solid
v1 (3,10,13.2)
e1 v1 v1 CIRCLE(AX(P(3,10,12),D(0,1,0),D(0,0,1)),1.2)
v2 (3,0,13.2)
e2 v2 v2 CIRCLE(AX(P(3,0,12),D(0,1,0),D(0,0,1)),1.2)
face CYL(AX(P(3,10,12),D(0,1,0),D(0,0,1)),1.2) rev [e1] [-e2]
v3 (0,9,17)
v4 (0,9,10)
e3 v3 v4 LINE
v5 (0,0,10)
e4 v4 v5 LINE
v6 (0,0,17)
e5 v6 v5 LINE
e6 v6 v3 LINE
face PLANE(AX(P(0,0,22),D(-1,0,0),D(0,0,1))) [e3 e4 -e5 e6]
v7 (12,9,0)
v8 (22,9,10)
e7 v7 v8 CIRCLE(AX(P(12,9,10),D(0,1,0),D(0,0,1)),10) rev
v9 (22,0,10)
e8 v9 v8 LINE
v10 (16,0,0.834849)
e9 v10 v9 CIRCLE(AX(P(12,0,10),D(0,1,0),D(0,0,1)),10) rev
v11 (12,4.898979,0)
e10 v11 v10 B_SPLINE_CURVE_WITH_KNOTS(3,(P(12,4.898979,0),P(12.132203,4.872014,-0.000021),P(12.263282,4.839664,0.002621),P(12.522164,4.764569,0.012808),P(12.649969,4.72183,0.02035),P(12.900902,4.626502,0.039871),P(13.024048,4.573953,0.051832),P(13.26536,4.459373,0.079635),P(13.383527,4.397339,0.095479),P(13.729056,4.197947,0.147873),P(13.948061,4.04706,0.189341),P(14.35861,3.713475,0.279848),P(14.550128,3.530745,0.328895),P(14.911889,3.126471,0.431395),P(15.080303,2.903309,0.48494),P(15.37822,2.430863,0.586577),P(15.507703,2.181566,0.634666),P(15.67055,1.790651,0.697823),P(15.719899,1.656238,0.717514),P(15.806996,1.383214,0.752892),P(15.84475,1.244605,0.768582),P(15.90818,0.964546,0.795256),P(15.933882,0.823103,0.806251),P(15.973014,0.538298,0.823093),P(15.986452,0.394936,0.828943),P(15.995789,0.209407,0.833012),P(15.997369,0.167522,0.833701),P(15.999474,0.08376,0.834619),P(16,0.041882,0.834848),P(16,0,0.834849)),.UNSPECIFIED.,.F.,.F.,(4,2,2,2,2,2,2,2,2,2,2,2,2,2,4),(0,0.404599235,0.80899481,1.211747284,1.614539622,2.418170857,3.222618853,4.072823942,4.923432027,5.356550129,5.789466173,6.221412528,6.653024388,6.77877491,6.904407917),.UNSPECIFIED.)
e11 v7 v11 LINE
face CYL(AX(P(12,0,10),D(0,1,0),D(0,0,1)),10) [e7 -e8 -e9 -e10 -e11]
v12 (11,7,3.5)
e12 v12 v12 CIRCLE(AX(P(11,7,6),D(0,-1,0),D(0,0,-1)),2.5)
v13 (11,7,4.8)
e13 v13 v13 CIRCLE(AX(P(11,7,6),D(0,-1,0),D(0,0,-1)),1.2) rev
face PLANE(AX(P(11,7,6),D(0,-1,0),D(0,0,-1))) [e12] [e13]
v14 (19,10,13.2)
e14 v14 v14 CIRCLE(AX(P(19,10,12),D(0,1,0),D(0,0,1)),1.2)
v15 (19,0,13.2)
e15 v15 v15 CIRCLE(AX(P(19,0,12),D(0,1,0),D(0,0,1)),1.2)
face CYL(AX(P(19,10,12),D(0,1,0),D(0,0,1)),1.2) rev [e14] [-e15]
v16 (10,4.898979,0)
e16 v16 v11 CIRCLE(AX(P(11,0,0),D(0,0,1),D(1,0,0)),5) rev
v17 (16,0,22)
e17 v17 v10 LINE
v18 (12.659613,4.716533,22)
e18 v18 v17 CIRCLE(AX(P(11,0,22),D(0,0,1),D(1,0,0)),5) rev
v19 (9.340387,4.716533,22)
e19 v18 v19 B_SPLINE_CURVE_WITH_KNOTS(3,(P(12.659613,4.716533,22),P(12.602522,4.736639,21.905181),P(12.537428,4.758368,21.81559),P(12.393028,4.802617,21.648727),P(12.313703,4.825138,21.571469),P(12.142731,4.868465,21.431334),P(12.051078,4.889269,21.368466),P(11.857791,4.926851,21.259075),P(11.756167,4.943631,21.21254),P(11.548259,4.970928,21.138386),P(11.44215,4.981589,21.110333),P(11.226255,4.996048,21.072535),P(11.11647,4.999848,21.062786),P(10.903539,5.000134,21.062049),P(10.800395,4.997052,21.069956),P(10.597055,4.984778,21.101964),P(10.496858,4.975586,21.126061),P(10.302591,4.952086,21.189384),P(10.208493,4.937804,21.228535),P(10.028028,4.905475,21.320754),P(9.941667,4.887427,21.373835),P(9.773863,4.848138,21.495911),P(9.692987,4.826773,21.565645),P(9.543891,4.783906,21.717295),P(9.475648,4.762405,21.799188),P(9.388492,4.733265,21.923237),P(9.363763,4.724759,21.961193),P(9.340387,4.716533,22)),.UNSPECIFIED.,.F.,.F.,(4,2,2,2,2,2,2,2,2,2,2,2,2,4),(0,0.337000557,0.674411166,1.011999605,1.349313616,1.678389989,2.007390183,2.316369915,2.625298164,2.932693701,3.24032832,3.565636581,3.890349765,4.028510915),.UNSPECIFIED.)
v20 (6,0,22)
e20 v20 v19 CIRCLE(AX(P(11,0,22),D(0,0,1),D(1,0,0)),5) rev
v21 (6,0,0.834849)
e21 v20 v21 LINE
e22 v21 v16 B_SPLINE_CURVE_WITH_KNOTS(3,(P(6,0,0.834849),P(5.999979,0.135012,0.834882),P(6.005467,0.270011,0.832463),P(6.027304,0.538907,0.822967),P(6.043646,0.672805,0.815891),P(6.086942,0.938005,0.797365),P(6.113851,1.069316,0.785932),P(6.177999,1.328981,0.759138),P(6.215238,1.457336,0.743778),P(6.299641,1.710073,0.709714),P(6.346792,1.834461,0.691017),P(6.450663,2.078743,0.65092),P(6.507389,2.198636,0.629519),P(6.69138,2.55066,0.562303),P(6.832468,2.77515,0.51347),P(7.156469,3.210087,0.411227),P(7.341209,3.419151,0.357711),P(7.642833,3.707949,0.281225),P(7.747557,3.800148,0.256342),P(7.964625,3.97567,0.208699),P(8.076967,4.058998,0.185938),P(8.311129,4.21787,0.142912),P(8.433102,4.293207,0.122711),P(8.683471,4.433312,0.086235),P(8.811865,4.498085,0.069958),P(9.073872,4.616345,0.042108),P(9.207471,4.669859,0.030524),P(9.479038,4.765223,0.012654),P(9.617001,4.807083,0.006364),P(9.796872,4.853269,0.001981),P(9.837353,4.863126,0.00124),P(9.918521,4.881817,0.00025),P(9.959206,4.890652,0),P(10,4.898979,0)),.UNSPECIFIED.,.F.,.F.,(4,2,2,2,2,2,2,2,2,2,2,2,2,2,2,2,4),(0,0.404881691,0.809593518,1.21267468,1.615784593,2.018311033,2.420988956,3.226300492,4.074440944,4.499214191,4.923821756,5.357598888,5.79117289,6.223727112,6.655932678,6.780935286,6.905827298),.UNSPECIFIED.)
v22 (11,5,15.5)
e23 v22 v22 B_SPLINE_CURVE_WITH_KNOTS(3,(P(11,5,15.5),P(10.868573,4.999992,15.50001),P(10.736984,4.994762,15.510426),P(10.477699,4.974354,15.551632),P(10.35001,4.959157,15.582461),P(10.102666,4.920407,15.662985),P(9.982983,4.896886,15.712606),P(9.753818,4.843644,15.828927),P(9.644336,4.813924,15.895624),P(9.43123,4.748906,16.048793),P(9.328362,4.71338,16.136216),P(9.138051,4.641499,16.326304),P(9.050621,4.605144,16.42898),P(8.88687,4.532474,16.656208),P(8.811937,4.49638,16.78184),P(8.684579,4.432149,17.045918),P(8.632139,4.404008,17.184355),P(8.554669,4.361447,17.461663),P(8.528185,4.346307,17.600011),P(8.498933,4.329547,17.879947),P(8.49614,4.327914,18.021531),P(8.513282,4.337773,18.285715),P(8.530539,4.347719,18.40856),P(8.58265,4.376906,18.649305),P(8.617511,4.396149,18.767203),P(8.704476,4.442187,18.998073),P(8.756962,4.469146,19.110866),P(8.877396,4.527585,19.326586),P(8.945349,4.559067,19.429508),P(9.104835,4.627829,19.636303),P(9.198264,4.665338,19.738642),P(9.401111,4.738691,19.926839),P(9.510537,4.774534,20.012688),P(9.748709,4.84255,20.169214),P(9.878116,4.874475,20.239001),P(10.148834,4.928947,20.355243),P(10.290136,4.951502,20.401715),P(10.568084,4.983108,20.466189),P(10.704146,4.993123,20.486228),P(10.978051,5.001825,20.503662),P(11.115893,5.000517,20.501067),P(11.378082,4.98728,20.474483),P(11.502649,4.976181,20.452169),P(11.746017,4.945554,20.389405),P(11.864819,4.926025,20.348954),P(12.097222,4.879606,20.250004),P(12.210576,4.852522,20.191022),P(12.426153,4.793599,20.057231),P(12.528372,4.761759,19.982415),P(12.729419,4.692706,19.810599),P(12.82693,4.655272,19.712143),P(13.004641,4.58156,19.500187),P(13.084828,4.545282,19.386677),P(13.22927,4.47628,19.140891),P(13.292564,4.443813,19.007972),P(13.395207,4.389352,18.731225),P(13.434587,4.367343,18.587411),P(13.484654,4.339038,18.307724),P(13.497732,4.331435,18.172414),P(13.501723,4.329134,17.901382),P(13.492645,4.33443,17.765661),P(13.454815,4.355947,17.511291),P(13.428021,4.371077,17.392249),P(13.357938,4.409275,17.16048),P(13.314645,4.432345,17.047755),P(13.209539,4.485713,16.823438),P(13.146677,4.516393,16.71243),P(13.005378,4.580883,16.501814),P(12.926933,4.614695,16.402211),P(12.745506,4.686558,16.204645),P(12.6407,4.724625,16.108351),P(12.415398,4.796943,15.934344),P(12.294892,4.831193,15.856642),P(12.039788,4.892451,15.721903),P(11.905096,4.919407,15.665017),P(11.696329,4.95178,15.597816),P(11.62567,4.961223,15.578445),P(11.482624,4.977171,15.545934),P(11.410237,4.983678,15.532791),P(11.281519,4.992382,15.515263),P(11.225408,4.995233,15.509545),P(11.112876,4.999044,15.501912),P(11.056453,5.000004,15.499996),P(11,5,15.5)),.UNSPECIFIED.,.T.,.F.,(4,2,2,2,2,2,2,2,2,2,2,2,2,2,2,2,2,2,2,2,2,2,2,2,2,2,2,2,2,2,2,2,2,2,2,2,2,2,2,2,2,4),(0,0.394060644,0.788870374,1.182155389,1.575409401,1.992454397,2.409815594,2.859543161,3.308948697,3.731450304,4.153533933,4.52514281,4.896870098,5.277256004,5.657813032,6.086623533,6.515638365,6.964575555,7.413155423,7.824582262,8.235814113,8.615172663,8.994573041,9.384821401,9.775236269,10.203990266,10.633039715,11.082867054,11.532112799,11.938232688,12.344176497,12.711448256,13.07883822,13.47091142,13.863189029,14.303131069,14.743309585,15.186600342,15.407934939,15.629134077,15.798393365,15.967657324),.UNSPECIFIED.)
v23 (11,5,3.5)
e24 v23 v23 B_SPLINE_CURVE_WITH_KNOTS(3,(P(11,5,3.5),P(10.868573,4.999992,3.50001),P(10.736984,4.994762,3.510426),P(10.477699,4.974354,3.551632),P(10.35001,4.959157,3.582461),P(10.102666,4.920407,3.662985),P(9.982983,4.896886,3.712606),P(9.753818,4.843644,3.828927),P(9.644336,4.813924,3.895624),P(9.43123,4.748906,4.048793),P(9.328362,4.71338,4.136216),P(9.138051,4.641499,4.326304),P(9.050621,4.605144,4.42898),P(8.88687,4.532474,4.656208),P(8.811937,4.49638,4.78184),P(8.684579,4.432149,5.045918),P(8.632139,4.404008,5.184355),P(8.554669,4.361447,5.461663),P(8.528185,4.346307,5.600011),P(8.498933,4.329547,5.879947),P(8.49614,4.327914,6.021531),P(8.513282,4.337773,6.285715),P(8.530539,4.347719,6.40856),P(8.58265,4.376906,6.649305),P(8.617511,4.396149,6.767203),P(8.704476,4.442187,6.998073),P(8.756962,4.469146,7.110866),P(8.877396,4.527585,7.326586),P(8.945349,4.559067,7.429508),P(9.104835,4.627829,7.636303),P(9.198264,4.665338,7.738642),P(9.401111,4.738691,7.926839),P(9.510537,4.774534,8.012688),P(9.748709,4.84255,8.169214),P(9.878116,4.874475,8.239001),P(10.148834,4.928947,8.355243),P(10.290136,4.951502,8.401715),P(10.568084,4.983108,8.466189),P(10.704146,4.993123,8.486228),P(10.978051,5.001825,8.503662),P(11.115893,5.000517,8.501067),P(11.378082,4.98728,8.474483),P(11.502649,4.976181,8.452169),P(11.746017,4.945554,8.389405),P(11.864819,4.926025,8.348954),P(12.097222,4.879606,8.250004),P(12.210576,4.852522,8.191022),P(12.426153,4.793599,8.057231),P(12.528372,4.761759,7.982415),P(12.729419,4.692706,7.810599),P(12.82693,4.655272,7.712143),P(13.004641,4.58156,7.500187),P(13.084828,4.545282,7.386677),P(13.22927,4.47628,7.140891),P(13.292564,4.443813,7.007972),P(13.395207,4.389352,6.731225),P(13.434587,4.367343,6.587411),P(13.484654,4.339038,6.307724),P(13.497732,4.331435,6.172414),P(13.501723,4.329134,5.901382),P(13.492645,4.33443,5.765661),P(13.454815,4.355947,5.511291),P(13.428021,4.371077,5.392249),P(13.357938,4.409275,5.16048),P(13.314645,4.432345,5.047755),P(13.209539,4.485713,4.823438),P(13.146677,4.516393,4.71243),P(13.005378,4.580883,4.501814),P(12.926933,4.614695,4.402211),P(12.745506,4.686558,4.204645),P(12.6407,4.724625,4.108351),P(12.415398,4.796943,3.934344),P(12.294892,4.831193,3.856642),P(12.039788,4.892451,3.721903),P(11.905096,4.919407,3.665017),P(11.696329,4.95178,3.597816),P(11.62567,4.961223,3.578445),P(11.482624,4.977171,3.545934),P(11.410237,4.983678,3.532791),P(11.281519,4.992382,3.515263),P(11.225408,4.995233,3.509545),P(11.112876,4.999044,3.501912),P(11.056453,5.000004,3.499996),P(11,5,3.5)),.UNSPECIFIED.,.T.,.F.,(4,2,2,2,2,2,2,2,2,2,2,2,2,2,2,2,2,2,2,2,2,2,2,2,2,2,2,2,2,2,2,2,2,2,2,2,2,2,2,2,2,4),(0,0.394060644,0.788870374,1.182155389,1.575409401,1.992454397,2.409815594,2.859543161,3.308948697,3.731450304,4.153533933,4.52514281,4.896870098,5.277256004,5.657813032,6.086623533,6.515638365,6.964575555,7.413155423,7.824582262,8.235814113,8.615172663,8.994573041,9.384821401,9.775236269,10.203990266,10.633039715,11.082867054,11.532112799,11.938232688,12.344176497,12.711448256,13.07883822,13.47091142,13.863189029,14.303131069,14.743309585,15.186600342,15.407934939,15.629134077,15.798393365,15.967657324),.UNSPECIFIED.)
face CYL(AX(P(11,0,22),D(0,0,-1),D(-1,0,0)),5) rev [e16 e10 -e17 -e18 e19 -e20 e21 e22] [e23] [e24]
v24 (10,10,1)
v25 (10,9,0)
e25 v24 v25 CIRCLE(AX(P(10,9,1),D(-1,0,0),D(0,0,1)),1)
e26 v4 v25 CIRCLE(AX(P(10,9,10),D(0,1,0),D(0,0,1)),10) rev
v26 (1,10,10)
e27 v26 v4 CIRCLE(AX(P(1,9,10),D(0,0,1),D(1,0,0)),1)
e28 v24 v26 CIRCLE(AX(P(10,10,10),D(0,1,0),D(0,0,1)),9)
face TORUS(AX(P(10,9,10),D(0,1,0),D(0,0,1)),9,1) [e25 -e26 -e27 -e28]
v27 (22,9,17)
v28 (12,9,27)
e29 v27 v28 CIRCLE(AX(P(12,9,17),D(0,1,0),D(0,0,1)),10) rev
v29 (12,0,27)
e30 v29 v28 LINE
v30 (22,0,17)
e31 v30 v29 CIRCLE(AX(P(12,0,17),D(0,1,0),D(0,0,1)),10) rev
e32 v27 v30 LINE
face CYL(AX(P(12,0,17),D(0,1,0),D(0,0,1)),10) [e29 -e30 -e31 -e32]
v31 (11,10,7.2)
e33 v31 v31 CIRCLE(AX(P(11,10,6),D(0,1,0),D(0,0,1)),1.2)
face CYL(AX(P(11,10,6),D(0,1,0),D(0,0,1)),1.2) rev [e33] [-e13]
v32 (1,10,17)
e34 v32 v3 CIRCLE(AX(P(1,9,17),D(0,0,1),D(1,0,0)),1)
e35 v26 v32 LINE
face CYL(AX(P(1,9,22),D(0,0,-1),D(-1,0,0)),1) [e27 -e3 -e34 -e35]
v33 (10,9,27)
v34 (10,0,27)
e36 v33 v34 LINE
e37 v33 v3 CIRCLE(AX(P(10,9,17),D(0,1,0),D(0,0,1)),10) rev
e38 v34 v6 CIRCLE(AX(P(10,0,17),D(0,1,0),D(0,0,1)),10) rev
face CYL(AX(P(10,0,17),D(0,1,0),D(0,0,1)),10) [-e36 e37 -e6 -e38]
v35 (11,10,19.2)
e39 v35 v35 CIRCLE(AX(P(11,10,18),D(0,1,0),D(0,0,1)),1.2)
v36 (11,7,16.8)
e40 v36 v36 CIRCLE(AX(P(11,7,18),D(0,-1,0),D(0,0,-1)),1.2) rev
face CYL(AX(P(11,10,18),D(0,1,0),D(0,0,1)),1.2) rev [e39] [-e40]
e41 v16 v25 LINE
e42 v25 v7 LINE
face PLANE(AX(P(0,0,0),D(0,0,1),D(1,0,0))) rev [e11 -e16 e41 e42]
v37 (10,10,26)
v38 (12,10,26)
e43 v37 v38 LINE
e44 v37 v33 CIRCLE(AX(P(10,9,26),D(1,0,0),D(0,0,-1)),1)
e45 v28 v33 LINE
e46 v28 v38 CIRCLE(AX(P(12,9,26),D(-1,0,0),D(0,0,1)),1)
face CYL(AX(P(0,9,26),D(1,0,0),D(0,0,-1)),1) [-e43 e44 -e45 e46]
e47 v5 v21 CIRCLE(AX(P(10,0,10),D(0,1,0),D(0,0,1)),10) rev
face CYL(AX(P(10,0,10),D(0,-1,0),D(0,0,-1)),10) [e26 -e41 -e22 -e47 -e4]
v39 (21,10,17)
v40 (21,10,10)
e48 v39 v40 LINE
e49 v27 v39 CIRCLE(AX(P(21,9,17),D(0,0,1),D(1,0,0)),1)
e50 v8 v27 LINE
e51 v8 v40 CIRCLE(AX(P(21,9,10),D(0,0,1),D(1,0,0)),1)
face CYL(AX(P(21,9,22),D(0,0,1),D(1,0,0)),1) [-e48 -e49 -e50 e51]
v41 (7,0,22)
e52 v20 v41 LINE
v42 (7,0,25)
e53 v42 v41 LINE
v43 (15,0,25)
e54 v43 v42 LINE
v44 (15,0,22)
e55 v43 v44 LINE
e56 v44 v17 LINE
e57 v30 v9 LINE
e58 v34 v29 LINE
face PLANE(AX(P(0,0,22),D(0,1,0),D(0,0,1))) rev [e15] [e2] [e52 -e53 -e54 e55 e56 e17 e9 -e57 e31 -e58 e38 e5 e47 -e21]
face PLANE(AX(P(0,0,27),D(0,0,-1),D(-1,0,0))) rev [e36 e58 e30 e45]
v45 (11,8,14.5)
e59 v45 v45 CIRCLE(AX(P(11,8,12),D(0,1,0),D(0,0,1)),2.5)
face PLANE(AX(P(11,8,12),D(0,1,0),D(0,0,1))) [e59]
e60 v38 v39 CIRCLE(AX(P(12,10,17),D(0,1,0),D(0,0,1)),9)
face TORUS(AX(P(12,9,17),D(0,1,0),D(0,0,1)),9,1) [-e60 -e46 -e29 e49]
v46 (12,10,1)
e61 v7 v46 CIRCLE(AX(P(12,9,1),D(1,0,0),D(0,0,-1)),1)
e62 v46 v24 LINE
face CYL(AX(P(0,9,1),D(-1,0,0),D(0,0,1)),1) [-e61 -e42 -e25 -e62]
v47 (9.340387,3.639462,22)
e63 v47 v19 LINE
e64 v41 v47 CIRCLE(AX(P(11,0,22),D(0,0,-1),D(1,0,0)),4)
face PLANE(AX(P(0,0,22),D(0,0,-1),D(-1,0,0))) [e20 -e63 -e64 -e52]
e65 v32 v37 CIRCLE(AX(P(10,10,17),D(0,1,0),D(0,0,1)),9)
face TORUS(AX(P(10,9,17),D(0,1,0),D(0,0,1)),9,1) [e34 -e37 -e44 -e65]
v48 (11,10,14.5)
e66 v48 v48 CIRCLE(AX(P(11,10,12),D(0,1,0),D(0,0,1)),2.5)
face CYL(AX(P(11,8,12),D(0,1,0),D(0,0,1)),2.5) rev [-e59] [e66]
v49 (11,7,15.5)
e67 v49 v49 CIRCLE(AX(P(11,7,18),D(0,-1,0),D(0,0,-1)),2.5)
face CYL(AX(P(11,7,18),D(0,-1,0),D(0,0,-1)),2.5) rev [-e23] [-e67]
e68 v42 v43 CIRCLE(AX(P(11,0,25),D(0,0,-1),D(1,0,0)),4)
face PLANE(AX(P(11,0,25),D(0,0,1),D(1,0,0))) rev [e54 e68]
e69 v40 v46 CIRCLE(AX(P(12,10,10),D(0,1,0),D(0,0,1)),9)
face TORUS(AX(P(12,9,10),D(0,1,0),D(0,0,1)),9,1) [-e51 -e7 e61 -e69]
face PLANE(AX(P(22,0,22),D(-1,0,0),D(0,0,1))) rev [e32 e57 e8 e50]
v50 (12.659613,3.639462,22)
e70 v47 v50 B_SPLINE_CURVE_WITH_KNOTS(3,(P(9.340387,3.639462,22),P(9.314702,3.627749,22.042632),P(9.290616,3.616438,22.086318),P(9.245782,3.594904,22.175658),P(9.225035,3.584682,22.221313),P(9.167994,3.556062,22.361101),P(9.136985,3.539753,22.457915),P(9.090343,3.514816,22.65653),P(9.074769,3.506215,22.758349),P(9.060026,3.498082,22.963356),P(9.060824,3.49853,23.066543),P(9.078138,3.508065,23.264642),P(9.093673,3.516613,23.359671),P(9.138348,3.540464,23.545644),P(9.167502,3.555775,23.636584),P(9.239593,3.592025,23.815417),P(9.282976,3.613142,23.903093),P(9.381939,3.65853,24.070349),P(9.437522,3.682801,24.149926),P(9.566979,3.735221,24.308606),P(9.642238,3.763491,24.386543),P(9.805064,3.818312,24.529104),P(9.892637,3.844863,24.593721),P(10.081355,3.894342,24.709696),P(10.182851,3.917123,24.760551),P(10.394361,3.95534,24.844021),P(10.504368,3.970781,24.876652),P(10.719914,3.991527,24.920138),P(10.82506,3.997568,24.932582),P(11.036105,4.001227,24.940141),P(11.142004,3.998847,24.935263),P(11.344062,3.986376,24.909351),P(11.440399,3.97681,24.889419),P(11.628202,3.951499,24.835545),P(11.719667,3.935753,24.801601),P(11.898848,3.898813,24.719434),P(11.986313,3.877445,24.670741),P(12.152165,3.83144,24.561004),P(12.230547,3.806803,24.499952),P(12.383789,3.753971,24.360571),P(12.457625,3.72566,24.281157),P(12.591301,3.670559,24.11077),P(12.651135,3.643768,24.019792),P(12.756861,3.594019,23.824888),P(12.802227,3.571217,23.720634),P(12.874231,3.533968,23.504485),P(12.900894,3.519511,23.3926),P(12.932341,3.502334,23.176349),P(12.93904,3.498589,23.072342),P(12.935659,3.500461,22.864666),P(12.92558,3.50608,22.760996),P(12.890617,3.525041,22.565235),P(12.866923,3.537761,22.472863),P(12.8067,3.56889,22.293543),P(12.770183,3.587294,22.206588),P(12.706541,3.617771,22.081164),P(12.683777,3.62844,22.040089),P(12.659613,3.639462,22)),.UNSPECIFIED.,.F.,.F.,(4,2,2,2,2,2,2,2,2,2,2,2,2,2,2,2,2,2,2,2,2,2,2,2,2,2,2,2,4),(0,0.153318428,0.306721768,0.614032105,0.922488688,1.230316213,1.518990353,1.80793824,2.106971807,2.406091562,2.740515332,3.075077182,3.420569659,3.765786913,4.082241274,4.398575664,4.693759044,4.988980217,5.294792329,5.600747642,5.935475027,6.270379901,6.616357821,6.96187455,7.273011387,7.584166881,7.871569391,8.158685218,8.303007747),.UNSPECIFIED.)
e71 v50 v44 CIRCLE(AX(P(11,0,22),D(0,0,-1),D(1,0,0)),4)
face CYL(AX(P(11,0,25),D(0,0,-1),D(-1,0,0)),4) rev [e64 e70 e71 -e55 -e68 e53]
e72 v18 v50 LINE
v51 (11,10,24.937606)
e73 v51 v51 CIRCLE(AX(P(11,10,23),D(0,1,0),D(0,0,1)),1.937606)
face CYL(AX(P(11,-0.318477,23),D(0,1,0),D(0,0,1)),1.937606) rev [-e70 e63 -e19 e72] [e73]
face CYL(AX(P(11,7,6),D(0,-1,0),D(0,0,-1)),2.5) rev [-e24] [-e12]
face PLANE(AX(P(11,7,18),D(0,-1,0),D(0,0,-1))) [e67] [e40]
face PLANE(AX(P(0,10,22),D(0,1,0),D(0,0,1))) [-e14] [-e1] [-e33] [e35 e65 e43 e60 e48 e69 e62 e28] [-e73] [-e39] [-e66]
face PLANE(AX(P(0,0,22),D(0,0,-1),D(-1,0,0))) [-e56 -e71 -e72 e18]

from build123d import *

# Parameters (mm, degrees)
BOSS_EXTRU_1_DEPTH      = 22
D_GAGEMENT_M21_D        = 2.4
ESQUISSE5_W             = 22
ESQUISSE5_H             = 10
BOSS_EXTRU_2_DEPTH      = 5
CONG_1_R                = 10
CONG_3_R                = 1
ENL_V_MAT_EXTRU_2_DEPTH = 3
ESQUISSE12_R            = 1.9376057
ENL_V_MAT_EXTRU_3_DEPTH = 37.235341952
ESQUISSE13_R            = 2.5
ENL_V_MAT_EXTRU_4_DEPTH = 2
ESQUISSE15_R            = 2.5
ENL_V_MAT_EXTRU_5_DEPTH = 7


with BuildPart() as part:
    # Esquisse1 → Boss.-Extru.1 (new body)
    with BuildSketch(Plane.XY):
        with BuildLine():
            Line((0, 10), (0, 0))
            Line((0, 0), (6, 0))
            ThreePointArc((6, 0), (11, 5), (16, 0))
            Line((16, 0), (22, 0))
            Line((22, 0), (22, 10))
            Line((22, 10), (0, 10))
        make_face()
    extrude(amount=BOSS_EXTRU_1_DEPTH)

    # Dégagement M21 (through all)
    with Locations(Plane(origin=(0, 10, 0), x_dir=(1, 0, 0), z_dir=(0, 1, 0))):
        with Locations((11, -6), (11, -18), (3, -12), (19, -12)):
            Hole(D_GAGEMENT_M21_D / 2)

    # Esquisse5 → Boss.-Extru.2 (add)
    with BuildSketch(Plane.XY.offset(22)):
        with Locations((11, 5)):
            Rectangle(ESQUISSE5_W, ESQUISSE5_H)
    extrude(amount=BOSS_EXTRU_2_DEPTH)

    # Congé1
    # the kernel refuses this fillet: 10 mm, written as the material it takes off along each edge
    with BuildSketch(Plane(origin=(0, 35, 0), x_dir=(0, 0, 1), z_dir=(0, -1, 0))) as cong_1_piece_1:
        with BuildLine():
            CenterArc((CONG_1_R, -CONG_1_R), CONG_1_R, 90, 90)
            Line((0, -CONG_1_R), (0, 0))
            Line((0, 0), (CONG_1_R, 0))
        make_face()
    extrude(amount=60, mode=Mode.SUBTRACT)
    with BuildSketch(Plane(origin=(0, 35, 27), x_dir=(0, 0, -1), z_dir=(0, -1, 0)), Plane(origin=(22, -25, 0), x_dir=(-1, 0, 0), z_dir=(0, 1, 0)), Plane(origin=(22, -25, 27), x_dir=(0, 0, -1), z_dir=(0, 1, 0))) as cong_1_piece_2:
        with BuildLine():
            CenterArc((CONG_1_R, CONG_1_R), CONG_1_R, 180, 90)
            Line((0, CONG_1_R), (0, 0))
            Line((0, 0), (CONG_1_R, 0))
        make_face()
    extrude(amount=60, mode=Mode.SUBTRACT)

    # Congé3
    cong_3_edges = [part.edges().sort_by_distance(p)[0] for p in [
        (11, 10, 0),
        (0, 10, 13.5),
        (11, 10, 27),
        (22, 10, 13.5),
        (19.071067812, 10, 24.071067812),
        (19.071067812, 10, 2.928932188),
        (2.928932188, 10, 24.071067812),
        (2.928932188, 10, 2.928932188),
    ]]
    fillet(cong_3_edges, radius=CONG_3_R)

    # Esquisse10 → Enlèv. mat.-Extru.2 (cut)
    with BuildSketch(Plane(origin=(0, 0, 22), x_dir=(-1, 0, 0), z_dir=(0, 0, -1))):
        with BuildLine():
            Line((-7, 0), (-15, 0))
            ThreePointArc((-15, 0), (-11, 4), (-7, 0))
        make_face()
    extrude(amount=-ENL_V_MAT_EXTRU_2_DEPTH, mode=Mode.SUBTRACT)

    # Esquisse12 → Enlèv. mat.-Extru.3 (cut, through all)
    with BuildSketch(Plane(origin=(0, 10, 0), x_dir=(1, 0, 0), z_dir=(0, 1, 0))):
        with Locations(Location((11, -23, 0), (0, 0, 270))):
            Circle(ESQUISSE12_R)
    extrude(amount=-ENL_V_MAT_EXTRU_3_DEPTH, mode=Mode.SUBTRACT)

    # Esquisse13 → Enlèv. mat.-Extru.4 (cut)
    with BuildSketch(Plane(origin=(0, 10, 0), x_dir=(1, 0, 0), z_dir=(0, 1, 0))):
        with Locations(Location((11, -12, 0), (0, 0, 270))):
            Circle(ESQUISSE13_R)
    extrude(amount=-ENL_V_MAT_EXTRU_4_DEPTH, mode=Mode.SUBTRACT)

    # Esquisse15 → Enlèv. mat.-Extru.5 (cut)
    with BuildSketch(Plane.XZ):
        with Locations(Location((11, 18, 0), (0, 0, 270))):
            Circle(ESQUISSE15_R)
        with Locations(Location((11, 6, 0), (0, 0, 270))):
            Circle(ESQUISSE15_R)
    extrude(amount=-ENL_V_MAT_EXTRU_5_DEPTH, mode=Mode.SUBTRACT)


solid = part.part
